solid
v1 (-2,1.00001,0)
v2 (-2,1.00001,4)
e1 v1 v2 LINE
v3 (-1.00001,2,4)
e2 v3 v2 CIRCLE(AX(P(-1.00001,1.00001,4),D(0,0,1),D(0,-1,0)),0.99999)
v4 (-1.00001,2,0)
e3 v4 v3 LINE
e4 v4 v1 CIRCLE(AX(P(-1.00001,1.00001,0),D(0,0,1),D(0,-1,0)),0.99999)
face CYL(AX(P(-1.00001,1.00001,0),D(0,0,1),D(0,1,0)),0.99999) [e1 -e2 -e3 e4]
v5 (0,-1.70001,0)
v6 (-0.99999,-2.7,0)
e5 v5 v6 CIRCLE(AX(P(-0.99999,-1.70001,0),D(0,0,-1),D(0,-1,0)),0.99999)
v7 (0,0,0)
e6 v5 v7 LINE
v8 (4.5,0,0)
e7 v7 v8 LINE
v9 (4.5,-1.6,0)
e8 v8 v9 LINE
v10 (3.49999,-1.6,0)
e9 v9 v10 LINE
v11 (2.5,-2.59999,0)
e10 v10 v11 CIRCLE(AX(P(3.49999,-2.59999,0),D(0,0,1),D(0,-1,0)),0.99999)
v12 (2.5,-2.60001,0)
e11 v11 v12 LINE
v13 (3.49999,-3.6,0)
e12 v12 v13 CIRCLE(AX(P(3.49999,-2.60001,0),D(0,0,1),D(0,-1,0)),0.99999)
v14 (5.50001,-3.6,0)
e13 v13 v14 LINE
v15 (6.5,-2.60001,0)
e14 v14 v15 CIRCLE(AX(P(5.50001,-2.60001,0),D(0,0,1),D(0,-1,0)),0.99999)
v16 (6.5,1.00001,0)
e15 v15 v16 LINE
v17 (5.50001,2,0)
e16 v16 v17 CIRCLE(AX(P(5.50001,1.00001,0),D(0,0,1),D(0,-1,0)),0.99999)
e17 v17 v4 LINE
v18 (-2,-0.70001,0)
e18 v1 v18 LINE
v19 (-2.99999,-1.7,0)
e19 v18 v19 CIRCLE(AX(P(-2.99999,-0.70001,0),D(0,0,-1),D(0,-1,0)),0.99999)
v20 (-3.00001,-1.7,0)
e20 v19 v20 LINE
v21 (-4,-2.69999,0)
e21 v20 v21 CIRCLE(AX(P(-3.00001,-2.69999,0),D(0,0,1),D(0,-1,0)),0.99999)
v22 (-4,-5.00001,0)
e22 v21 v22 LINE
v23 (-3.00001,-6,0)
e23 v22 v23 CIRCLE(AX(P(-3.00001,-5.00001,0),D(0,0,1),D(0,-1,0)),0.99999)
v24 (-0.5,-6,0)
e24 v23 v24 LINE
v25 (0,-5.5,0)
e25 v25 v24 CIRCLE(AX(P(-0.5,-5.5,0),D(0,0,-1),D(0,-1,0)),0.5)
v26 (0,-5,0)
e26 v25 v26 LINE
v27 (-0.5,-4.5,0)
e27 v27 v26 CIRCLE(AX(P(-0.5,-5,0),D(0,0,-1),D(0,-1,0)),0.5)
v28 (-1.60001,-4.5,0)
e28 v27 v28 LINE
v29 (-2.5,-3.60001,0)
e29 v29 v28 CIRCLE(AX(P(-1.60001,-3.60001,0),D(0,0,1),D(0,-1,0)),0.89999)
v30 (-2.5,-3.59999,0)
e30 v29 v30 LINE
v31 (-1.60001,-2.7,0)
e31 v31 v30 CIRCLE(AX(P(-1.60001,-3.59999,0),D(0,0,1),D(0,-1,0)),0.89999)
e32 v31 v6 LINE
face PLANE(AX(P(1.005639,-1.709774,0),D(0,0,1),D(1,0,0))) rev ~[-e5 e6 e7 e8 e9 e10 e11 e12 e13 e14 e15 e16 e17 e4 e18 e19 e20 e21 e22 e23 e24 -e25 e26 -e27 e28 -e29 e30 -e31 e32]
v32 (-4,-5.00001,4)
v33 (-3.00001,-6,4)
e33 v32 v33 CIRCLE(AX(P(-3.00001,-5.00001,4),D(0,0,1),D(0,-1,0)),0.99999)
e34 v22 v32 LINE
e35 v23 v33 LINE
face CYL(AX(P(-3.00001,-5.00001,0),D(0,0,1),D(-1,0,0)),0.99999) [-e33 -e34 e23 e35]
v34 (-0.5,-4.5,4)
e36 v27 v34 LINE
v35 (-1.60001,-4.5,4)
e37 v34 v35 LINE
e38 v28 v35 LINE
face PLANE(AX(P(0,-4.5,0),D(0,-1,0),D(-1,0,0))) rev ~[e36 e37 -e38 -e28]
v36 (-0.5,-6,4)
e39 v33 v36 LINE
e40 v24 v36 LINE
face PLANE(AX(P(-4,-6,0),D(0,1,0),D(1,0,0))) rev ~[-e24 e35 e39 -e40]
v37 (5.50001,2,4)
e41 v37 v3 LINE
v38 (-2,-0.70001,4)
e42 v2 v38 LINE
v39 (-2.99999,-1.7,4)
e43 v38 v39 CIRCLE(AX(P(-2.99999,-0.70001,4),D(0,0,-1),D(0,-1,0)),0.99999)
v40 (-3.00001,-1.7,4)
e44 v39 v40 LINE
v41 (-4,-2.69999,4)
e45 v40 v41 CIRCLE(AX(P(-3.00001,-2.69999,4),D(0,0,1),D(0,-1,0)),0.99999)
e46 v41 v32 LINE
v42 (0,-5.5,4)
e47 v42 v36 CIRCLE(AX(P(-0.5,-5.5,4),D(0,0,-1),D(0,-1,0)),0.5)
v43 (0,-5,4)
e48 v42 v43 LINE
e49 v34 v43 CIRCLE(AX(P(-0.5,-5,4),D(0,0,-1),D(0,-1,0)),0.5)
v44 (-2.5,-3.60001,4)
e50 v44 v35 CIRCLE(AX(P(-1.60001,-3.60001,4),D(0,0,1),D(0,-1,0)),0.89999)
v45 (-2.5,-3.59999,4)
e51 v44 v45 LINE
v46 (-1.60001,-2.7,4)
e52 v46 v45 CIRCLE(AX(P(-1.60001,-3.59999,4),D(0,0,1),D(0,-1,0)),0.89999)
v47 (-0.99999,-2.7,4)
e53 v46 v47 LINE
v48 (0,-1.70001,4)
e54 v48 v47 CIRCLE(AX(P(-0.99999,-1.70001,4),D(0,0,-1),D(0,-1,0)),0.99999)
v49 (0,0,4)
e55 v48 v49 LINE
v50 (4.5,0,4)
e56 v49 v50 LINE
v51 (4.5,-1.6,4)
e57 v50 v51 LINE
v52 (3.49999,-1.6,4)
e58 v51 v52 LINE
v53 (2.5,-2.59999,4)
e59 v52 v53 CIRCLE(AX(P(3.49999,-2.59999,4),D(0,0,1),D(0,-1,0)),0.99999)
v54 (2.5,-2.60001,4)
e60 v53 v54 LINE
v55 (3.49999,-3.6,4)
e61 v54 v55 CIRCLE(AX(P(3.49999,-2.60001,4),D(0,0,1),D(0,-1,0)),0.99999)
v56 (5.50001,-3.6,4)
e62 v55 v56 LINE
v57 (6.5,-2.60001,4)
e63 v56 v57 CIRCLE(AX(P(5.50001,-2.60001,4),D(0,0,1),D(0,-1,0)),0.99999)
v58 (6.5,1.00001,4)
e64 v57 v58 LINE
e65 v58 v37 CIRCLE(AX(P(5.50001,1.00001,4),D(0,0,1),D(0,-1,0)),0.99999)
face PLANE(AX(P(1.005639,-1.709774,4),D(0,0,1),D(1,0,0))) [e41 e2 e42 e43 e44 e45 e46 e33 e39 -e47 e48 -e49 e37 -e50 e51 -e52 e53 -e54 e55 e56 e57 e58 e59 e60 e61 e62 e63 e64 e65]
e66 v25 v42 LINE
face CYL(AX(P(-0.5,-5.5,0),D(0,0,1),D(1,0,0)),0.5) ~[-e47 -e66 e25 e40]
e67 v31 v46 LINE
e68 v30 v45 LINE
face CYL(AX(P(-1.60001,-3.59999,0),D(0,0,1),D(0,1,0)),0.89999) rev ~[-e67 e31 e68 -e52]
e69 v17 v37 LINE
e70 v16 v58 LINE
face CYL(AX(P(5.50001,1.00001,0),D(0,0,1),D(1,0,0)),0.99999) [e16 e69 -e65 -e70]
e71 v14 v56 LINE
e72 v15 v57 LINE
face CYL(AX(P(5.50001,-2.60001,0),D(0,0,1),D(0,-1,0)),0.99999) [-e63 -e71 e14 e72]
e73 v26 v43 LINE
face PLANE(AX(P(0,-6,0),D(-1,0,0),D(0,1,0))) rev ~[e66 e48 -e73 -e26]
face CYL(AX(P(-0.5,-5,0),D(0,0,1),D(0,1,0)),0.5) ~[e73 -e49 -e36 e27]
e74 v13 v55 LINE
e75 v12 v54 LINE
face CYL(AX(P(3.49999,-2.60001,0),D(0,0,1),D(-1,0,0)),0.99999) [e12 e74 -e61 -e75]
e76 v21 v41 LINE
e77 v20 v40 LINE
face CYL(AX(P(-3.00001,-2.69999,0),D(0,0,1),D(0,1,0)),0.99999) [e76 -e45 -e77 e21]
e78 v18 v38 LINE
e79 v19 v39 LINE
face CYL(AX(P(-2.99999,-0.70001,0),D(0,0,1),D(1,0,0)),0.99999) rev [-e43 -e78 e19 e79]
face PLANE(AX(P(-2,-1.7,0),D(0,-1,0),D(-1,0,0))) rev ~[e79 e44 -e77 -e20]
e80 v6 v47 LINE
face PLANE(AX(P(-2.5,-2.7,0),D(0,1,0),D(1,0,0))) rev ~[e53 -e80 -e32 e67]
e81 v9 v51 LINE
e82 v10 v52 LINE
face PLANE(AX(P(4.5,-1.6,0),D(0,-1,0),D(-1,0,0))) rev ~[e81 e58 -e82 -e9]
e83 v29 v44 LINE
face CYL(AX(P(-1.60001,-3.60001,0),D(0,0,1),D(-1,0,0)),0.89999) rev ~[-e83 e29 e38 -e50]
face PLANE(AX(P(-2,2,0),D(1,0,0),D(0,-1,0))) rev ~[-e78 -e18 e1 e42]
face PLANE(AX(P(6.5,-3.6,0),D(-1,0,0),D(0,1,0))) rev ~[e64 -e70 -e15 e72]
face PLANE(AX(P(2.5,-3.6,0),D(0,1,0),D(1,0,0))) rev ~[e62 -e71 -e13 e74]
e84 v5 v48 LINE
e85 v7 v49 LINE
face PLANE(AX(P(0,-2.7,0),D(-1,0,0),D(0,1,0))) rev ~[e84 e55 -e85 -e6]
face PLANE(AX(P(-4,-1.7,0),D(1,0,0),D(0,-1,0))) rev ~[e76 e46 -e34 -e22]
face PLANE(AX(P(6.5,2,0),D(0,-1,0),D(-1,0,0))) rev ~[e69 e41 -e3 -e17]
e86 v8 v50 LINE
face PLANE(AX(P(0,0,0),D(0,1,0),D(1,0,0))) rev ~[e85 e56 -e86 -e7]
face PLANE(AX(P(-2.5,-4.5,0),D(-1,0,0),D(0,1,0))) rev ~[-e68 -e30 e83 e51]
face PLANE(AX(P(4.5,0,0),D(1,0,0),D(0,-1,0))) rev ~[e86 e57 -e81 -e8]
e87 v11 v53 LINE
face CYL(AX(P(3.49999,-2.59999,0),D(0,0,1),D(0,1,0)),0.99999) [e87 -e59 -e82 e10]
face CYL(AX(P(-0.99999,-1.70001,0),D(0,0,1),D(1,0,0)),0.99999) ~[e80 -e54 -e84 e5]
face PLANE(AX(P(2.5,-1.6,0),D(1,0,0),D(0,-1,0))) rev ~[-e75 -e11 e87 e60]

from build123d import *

# Parameters (mm, degrees)
F1_DEPTH = 4
F2_R     = 0.99999
F3_R     = 0.89999
F4_R     = 0.5


# Not quite as in the source:
# - a fillet or chamfer is up to 0.001 mm smaller than in the source, because OpenCascade refuses the exact size


with BuildPart() as f1:
    # F0 (on Top) → F1 (new body)
    with BuildSketch(Plane.XY):
        Polygon((0, -2.7), (0, 0), (4.5, 0), (4.5, -1.6), (2.5, -1.6), (2.5, -3.6), (6.5, -3.6), (6.5, 2), (-2, 2), (-2, -1.7), (-4, -1.7), (-4, -6), (0, -6), (0, -4.5), (-2.5, -4.5), (-2.5, -2.7), align=None)
    extrude(amount=F1_DEPTH)

    # F2 (radius 1 in the source; OpenCascade refuses exactly that, so slightly less here)
    f2_edges = [f1.edges().sort_by_distance(p)[0] for p in [
        (6.5, -3.6, 2),
        (6.5, 2, 2),
        (-2, 2, 2),
        (-2, -1.7, 2),
        (-4, -1.7, 2),
        (-4, -6, 2),
        (2.5, -3.6, 2),
        (0, -2.7, 2),
        (2.5, -1.6, 2),
    ]]
    fillet(f2_edges, radius=F2_R)

    # F3 (radius 0.9 in the source; OpenCascade refuses exactly that, so slightly less here)
    f3_edges = [f1.edges().sort_by_distance(p)[0] for p in [
        (-2.5, -2.7, 2),
        (-2.5, -4.5, 2),
    ]]
    fillet(f3_edges, radius=F3_R)

    # F4
    f4_edges = [f1.edges().sort_by_distance(p)[0] for p in [
        (0, -6, 2),
        (0, -4.5, 2),
    ]]
    fillet(f4_edges, radius=F4_R)


solid = f1.part
